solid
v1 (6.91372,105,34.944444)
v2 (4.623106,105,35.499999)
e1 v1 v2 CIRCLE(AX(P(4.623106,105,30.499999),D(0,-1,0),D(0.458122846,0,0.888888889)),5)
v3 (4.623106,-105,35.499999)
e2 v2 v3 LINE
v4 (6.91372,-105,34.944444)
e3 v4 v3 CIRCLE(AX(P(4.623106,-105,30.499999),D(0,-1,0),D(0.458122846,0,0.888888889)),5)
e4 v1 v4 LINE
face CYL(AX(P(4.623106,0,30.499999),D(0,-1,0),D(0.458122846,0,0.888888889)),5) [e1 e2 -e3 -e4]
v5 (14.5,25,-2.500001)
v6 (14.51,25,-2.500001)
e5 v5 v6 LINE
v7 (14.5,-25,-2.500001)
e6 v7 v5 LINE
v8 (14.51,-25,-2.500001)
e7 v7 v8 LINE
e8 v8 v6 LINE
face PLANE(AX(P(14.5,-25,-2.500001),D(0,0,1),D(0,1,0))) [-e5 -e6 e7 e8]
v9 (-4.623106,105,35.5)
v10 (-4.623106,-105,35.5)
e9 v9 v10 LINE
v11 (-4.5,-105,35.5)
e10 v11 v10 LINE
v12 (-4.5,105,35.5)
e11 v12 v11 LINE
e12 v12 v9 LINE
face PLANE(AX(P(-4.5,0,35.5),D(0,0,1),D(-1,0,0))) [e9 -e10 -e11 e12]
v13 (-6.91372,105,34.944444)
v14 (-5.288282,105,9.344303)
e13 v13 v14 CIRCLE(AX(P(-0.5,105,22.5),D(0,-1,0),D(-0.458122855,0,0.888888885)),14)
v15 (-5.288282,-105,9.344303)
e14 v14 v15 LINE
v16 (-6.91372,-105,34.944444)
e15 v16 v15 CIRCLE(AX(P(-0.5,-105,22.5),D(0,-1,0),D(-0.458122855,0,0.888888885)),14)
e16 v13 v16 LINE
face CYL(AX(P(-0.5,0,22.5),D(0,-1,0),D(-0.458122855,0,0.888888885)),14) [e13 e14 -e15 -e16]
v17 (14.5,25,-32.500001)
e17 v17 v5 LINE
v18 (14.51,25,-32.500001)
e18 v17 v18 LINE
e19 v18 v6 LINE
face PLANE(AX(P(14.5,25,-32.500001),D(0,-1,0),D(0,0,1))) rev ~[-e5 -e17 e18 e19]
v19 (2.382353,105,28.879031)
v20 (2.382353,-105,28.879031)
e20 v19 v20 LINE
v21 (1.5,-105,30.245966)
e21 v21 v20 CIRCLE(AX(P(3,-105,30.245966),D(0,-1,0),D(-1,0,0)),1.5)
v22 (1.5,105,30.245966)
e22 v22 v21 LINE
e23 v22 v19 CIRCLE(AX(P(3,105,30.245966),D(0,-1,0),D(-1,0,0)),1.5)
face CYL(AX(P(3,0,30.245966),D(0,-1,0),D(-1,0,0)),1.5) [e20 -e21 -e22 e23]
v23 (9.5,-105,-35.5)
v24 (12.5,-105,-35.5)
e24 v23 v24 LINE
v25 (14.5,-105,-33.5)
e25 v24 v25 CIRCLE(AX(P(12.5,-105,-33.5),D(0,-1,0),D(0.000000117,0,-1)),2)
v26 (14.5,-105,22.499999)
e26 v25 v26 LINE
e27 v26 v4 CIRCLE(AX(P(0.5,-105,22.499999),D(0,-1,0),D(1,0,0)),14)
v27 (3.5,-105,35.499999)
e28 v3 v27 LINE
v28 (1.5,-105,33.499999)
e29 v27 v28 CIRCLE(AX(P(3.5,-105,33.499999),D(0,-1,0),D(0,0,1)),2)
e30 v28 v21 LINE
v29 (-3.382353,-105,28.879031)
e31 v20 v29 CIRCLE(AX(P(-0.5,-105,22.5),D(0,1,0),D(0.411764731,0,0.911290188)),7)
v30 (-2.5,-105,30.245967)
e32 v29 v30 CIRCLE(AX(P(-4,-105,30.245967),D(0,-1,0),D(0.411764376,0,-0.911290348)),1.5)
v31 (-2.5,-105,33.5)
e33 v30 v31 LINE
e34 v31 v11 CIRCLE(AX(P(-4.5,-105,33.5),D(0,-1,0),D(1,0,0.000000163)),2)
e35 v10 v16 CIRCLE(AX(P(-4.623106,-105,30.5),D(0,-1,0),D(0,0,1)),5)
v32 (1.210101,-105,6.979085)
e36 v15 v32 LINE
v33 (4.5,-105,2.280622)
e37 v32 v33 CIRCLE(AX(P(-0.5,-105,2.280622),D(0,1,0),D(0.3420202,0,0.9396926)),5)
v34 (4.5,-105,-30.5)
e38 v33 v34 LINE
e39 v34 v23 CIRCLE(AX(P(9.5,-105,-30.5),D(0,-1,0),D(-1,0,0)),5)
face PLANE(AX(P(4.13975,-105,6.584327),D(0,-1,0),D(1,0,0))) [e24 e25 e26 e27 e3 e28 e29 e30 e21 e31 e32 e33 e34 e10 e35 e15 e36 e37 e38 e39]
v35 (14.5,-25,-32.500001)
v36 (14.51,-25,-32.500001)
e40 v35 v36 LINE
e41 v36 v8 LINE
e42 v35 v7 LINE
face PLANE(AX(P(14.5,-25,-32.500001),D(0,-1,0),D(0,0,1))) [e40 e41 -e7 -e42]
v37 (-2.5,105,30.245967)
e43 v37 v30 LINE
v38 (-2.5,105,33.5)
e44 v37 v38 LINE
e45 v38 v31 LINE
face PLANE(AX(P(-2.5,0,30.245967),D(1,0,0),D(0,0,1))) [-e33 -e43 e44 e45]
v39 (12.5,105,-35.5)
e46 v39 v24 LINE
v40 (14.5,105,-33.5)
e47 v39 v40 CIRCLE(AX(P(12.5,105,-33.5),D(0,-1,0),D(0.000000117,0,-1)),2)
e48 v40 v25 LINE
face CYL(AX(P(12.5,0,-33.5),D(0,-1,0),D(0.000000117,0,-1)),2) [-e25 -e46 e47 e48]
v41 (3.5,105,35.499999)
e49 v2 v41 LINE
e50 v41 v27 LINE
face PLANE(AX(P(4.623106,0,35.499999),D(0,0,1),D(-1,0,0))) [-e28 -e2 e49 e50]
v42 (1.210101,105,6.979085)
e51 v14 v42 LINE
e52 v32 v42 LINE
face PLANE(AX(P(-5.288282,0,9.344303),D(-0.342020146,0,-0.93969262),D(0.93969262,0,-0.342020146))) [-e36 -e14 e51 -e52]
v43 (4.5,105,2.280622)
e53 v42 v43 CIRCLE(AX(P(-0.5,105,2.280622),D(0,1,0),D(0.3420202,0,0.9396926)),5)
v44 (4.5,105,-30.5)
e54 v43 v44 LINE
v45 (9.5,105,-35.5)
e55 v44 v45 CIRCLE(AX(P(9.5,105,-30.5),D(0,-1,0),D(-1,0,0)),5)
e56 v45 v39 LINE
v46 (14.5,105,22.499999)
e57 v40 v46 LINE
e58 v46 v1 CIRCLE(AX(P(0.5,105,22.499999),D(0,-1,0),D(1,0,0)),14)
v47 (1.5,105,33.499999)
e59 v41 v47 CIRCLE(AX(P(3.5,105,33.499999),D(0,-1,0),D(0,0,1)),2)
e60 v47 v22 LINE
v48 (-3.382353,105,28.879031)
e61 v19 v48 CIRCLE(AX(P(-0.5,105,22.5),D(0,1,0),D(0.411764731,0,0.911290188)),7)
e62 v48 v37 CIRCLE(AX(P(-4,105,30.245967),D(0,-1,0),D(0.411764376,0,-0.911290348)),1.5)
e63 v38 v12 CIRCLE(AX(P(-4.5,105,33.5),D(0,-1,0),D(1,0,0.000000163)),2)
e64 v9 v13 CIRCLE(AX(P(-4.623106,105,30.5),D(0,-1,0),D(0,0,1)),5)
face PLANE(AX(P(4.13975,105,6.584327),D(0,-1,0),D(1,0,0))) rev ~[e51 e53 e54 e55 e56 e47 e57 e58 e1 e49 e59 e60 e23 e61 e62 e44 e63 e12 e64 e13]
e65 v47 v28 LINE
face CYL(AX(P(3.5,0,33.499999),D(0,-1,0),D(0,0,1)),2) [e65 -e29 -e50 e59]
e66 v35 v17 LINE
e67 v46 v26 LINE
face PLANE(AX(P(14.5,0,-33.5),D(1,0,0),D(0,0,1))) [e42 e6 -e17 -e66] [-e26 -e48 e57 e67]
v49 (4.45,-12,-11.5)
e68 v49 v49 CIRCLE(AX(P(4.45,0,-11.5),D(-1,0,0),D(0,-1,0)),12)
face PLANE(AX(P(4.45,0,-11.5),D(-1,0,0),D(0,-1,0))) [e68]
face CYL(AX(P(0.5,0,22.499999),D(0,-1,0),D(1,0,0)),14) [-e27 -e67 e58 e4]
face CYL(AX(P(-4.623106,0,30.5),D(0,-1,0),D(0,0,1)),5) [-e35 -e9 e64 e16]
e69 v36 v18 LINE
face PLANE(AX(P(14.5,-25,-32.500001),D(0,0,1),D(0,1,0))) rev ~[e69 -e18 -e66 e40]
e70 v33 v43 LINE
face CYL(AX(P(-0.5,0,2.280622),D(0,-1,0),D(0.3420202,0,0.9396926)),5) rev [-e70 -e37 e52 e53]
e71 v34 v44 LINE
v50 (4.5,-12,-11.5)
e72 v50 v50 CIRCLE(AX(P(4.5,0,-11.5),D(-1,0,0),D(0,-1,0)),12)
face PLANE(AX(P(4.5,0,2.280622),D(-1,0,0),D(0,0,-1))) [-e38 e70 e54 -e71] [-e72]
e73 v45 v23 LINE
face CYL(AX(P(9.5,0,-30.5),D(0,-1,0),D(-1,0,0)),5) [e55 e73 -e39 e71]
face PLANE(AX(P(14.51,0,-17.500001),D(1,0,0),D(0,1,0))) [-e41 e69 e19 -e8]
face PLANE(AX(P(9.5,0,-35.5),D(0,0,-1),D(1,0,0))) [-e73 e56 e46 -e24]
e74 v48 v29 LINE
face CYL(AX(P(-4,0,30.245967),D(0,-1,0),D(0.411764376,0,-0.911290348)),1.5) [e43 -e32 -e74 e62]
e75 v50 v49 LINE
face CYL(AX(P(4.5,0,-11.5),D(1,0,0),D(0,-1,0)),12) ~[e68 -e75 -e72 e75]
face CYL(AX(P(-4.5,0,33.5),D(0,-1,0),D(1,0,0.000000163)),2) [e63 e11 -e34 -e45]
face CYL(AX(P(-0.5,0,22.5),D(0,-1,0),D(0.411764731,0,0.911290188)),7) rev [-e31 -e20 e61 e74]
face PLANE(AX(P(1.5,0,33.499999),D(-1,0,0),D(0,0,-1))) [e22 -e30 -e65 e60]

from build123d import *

# Parameters (mm, degrees)
F1_DEPTH = 105
F2_R     = 12
F3_DEPTH = 0.05
F4_W     = 50
F4_H     = 30
F5_DEPTH = 0.01


# Not quite as in the source:
# - ends of sketch curves that miss each other by under 0.0002 mm in the source are joined


with BuildPart() as f1:
    # F0 (on Front) → F1 (new body, symmetric)
    with BuildSketch(Plane.XZ):
        with BuildLine():
            Line((4.4999999997, -23.5), (4.4999999997, -30.5))
            ThreePointArc((4.4999999997, -30.5), (5.9644660938, -34.0355339059), (9.4999999997, -35.5))
            Line((9.4999999997, -35.5), (12.5, -35.5))
            ThreePointArc((12.5, -35.5), (13.9142133287, -34.9142135624), (14.4999997663, -33.5))
            Line((14.4999997663, -33.5), (14.4999997663, 22.4999994828))
            ThreePointArc((14.4999997663, 22.4999994828), (12.4539129776, 29.7872458033), (6.9137199183, 34.9444437777))
            ThreePointArc((6.9137199183, 34.9444437777), (5.8016169865, 35.3591259101), (4.6231056877, 35.4999993303))
            Line((4.6231056877, 35.4999993303), (3.4999997663, 35.4999993303))
            ThreePointArc((3.4999997663, 35.4999993303), (2.0857862039, 34.9142128927), (1.4999997663, 33.4999993303))
            Line((1.4999997663, 33.4999993303), (1.4999997663, 30.2459664828))
            ThreePointArc((1.4999997663, 30.2459664828), (1.7397477835, 29.4324771221), (2.3823530195, 28.8790310431))
            ThreePointArc((2.3823530195, 28.8790310431), (-0.5000000985, 15.4999997293), (-3.3823532363, 28.8790310342))
            ThreePointArc((-3.3823532363, 28.8790310342), (-2.7397478169, 29.4324771961), (-2.4999997997, 30.2459665567))
            Line((-2.4999997997, 30.2459665567), (-2.4999997997, 33.5))
            ThreePointArc((-2.4999997997, 33.5), (-3.0857862373, 34.9142132361), (-4.4999997997, 35.4999996738))
            Line((-4.4999997997, 35.4999996738), (-4.6231058319, 35.4999996738))
            ThreePointArc((-4.6231058319, 35.4999996738), (-5.8016171306, 35.3591262536), (-6.9137200625, 34.9444441212))
            ThreePointArc((-6.9137200625, 34.9444441212), (-14.4718653147, 21.6128794539), (-5.288282, 9.344303))
            Line((-5.288282, 9.344303), (1.210101, 6.979085))
            ThreePointArc((1.210101, 6.979085), (3.5957603078, 5.1485040574), (4.4999999997, 2.2806219993))
            Line((4.4999999997, 2.2806219993), (4.4999999997, 0.5))
            Line((4.4999999997, 0.5), (4.4999999997, -23.5))
        make_face()
    extrude(amount=F1_DEPTH, both=True)

    # F2 (on face) → F3 (join)
    with BuildSketch(Plane(origin=(4.4999999997, 0, 0), x_dir=(0, -1, 0), z_dir=(-1, 0, 0))):
        with Locations((0, -11.5)):
            Circle(F2_R)
    extrude(amount=F3_DEPTH)

    # F4 (on face) → F5 (join)
    with BuildSketch(Plane.YZ.offset(14.4999997663)):
        with Locations((0, -17.5000005172)):
            Rectangle(F4_W, F4_H)
    extrude(amount=F5_DEPTH)


solid = f1.part
